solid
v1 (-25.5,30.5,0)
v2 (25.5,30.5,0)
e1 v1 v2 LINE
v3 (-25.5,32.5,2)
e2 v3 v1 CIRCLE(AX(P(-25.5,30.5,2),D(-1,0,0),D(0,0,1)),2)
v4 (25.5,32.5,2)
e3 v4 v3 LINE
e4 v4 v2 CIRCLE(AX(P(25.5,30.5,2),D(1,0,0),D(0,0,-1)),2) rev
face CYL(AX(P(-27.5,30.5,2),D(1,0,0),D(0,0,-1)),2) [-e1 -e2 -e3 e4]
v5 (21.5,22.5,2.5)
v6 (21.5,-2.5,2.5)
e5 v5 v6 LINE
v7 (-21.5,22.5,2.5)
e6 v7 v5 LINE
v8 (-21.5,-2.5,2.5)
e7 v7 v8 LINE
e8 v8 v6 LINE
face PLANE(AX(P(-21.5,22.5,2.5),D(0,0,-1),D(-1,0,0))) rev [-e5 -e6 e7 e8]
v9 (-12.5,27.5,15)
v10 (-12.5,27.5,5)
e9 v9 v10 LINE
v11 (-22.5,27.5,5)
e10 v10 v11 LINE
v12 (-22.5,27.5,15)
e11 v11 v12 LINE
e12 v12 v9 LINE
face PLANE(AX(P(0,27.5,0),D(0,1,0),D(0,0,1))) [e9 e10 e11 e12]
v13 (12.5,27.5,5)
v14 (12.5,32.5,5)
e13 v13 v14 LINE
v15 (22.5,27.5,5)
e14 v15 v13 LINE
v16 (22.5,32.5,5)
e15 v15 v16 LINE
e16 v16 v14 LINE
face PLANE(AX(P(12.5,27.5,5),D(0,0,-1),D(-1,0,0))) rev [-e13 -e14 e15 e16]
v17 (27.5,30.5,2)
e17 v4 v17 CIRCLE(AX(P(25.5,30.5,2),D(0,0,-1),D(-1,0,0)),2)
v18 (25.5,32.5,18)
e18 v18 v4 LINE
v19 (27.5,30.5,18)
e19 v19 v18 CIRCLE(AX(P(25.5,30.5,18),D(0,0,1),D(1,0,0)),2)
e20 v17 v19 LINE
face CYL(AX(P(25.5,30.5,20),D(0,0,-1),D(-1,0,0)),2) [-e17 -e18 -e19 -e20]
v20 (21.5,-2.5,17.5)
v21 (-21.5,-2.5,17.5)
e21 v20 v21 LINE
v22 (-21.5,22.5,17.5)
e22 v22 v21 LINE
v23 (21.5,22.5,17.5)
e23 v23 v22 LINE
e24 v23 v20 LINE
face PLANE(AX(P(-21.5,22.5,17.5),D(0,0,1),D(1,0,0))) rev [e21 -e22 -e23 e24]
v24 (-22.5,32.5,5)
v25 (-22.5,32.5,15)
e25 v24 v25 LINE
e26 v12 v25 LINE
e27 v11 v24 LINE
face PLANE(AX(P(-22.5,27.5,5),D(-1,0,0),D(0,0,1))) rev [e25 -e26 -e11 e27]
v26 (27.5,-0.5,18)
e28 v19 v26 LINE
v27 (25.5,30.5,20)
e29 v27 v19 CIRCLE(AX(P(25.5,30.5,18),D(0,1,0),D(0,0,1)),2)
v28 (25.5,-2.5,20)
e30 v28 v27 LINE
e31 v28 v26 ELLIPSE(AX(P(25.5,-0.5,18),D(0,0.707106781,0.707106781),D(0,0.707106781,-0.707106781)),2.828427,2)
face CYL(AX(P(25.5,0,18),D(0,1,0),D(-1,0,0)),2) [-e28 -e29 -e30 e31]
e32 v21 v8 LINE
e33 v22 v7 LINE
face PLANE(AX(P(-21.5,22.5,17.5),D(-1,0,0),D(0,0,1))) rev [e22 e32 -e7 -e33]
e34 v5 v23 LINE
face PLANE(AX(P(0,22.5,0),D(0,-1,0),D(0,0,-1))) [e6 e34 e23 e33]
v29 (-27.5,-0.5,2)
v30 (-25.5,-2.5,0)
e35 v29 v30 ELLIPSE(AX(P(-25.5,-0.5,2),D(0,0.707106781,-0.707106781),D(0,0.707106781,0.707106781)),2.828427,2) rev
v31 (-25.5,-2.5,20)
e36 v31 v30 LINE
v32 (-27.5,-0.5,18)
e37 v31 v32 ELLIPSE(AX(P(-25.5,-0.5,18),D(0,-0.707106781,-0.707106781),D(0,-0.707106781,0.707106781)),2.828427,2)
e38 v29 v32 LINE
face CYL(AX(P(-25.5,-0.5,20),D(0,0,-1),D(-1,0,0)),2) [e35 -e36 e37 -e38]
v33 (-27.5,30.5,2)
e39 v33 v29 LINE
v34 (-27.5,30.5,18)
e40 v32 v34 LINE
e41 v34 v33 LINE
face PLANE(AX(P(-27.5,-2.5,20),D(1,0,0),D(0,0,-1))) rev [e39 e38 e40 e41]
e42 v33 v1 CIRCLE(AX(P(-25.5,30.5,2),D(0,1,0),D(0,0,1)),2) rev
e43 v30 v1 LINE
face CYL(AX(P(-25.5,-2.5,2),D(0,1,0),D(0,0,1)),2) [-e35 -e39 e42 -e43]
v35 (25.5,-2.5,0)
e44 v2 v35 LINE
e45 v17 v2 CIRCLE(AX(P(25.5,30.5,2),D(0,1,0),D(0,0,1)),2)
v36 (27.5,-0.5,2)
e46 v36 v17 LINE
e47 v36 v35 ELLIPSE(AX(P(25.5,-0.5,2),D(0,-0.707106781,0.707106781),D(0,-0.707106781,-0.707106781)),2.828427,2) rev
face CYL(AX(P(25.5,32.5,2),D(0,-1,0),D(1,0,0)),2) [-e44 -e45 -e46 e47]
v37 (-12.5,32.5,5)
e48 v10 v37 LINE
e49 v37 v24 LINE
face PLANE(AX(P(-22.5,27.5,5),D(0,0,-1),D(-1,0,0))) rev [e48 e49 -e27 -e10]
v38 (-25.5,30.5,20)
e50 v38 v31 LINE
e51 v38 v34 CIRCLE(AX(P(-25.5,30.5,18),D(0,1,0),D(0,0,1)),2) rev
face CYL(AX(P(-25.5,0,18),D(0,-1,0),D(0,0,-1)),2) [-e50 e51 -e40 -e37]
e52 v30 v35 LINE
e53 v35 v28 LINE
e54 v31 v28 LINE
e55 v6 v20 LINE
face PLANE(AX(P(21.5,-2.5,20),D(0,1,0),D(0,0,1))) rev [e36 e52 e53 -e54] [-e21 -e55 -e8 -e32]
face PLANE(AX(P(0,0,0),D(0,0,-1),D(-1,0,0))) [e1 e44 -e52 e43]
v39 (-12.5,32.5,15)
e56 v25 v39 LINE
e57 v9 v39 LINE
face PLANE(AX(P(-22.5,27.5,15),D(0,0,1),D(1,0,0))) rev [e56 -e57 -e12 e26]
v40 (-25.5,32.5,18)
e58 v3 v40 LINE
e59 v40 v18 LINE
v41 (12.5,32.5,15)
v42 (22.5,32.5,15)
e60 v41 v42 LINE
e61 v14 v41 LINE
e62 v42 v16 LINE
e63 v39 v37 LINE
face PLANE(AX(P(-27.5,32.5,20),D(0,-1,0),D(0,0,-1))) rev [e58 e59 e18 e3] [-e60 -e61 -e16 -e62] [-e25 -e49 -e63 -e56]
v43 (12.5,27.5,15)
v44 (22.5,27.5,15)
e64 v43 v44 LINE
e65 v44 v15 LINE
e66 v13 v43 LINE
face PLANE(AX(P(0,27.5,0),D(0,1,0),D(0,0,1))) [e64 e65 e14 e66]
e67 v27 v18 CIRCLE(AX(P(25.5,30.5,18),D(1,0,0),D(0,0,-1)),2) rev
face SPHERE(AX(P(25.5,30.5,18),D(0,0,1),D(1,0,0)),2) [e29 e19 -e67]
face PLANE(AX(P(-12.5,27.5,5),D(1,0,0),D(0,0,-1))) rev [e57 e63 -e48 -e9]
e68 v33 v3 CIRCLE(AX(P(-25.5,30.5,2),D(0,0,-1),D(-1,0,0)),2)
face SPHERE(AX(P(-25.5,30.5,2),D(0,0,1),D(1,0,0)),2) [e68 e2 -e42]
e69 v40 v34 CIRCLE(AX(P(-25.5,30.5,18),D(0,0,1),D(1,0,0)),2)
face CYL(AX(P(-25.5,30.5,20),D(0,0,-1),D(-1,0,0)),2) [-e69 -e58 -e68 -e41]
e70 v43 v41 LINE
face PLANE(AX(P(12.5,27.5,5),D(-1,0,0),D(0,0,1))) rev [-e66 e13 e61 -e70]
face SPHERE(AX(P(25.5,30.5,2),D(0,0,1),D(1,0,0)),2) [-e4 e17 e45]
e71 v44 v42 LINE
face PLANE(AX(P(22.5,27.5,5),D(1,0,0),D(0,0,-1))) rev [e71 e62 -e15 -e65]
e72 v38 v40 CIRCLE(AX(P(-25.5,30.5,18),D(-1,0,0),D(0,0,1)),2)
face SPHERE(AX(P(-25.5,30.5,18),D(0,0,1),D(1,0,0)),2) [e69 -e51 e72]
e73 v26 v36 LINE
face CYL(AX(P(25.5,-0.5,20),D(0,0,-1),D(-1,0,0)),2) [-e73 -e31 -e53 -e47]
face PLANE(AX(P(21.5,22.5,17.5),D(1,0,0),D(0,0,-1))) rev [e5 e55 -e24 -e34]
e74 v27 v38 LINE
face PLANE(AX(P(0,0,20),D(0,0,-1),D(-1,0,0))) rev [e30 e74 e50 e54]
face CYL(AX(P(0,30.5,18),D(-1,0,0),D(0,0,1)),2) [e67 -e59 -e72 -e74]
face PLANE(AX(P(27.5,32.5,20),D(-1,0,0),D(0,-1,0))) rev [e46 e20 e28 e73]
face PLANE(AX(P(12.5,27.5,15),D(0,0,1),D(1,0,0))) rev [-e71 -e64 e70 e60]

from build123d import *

# Parameters (mm, degrees)
BOSS_EXTRUDE1_DEPTH = 20
SKETCH6_W           = 10
SKETCH6_H           = 10
CUT_EXTRUDE2_DEPTH  = 5
SKETCH7_W           = 10
SKETCH7_H           = 10
CUT_EXTRUDE3_DEPTH  = 5
FILLET1_R           = 2
FILLET2_R           = 2
CUT_EXTRUDE4_DEPTH  = 30
SKETCH9_W           = 43
SKETCH9_H           = 15
CUT_EXTRUDE5_DEPTH  = 25


with BuildPart() as part:
    # Sketch1 → Boss-Extrude1 (new body)
    with BuildSketch(Plane.XY):
        Polygon((-27.5, 32.5), (27.5, 32.5), (27.5, -2.5), (21.5, -2.5), (21.5, -32.5), (-21.5, -32.5), (-21.5, -2.5), (-27.5, -2.5), align=None)
    extrude(amount=BOSS_EXTRUDE1_DEPTH)

    # Sketch6 → Cut-Extrude2 (cut)
    with BuildSketch(Plane(origin=(0, 32.5, 0), x_dir=(1, 0, 0), z_dir=(0, 1, 0))):
        with Locations((-17.5, -10)):
            Rectangle(SKETCH6_W, SKETCH6_H)
        with Locations((17.5, -10)):
            Rectangle(SKETCH6_W, SKETCH6_H)
    extrude(amount=-CUT_EXTRUDE2_DEPTH, mode=Mode.SUBTRACT)

    # Sketch7 → Cut-Extrude3 (cut)
    with BuildSketch(Plane.XZ.offset(32.5)):
        with Locations((-14, 7.5)):
            Rectangle(SKETCH7_W, SKETCH7_H)
        with Locations((14, 7.5)):
            Rectangle(SKETCH7_W, SKETCH7_H)
    extrude(amount=-CUT_EXTRUDE3_DEPTH, mode=Mode.SUBTRACT)

    # Fillet1
    fillet1_edges = [part.edges().sort_by_distance(p)[0] for p in [
        (-21.5, -17.5, 0),
        (-27.5, 15, 0),
        (-27.5, 32.5, 10),
        (27.5, 32.5, 10),
        (27.5, -2.5, 10),
        (-21.5, -32.5, 10),
        (-27.5, -2.5, 10),
        (0, -32.5, 20),
        (21.5, -17.5, 20),
        (27.5, 15, 20),
        (0, 32.5, 20),
        (-27.5, 15, 20),
        (0, 32.5, 0),
        (27.5, 15, 0),
        (21.5, -17.5, 0),
    ]]
    fillet(fillet1_edges, radius=FILLET1_R)

    # Fillet2
    # the kernel refuses this fillet: 2 mm, written as the material it takes off along each edge
    with BuildSketch(Plane(origin=(-19.5, -30.5, 2), x_dir=(0, 0, -1), z_dir=(0, -1, 0))) as fillet2_piece_1_section:
        Polygon((0, 0), (FILLET2_R, 0), (FILLET2_R, -FILLET2_R), (0, -FILLET2_R), align=None)
    fillet2_piece_1 = extrude(amount=FILLET2_R, mode=Mode.PRIVATE)
    fillet2_piece_1 = fillet2_piece_1 - Plane(origin=(-19.5, -30.5, 2), x_dir=(0.7071067811865475, 0, 0.7071067811865475), z_dir=(0, -1, 0)) * Sphere(FILLET2_R, mode=Mode.PRIVATE)
    add(fillet2_piece_1, mode=Mode.SUBTRACT)
    with BuildSketch(Plane(origin=(19.5, -30.5, 18), x_dir=(1, 0, 0), z_dir=(0, -1, 0))) as fillet2_piece_2_section:
        Polygon((0, 0), (FILLET2_R, 0), (FILLET2_R, FILLET2_R), (0, FILLET2_R), align=None)
    fillet2_piece_2 = extrude(amount=FILLET2_R, mode=Mode.PRIVATE)
    fillet2_piece_2 = fillet2_piece_2 - Plane(origin=(19.5, -30.5, 18), x_dir=(-0.7071067811865475, 0, -0.7071067811865475), z_dir=(0, -1, 0)) * Sphere(FILLET2_R, mode=Mode.PRIVATE)
    add(fillet2_piece_2, mode=Mode.SUBTRACT)
    with BuildSketch(Plane(origin=(21.5, -32.5, 2), x_dir=(-1, 0, 0), z_dir=(0, 0, 1))) as fillet2_piece_3:
        with BuildLine():
            CenterArc((FILLET2_R, -FILLET2_R), FILLET2_R, 90, 90)
            Line((0, -FILLET2_R), (0, 0))
            Line((0, 0), (FILLET2_R, 0))
        make_face()
    extrude(amount=16, mode=Mode.SUBTRACT)
    with BuildSketch(Plane(origin=(19.5, -32.5, 0), x_dir=(0, 0, 1), z_dir=(-1, 0, 0))) as fillet2_piece_4:
        with BuildLine():
            CenterArc((FILLET2_R, FILLET2_R), FILLET2_R, 180, 90)
            Line((0, FILLET2_R), (0, 0))
            Line((0, 0), (FILLET2_R, 0))
        make_face()
    extrude(amount=39, mode=Mode.SUBTRACT)
    with BuildSketch(Plane(origin=(19.5, -32.5, 2), x_dir=(0, 0, -1), z_dir=(-1, 0, 0))) as fillet2_piece_5:
        with BuildLine():
            CenterArc((2 - FILLET2_R, -FILLET2_R), FILLET2_R, 360, 90)
            Line((2, -FILLET2_R), (2, 0))
            Line((2, 0), (2 - FILLET2_R, 0))
        make_face()
    revolve(axis=Axis((19.5, -32.5, 2), (0, -1, 0)), revolution_arc=90, mode=Mode.SUBTRACT)

    # Sketch8 → Cut-Extrude4 (cut)
    with BuildSketch(Plane(origin=(0, -2.5, 0), x_dir=(-1, 0, 0), z_dir=(0, -1, 0))):
        Polygon((-23.544279595, 2.278765761), (24.281911255, 2.554989635), (24.437245142, -24.339963353), (-23.544279595, -24.339963353), align=None)
    extrude(amount=CUT_EXTRUDE4_DEPTH, mode=Mode.SUBTRACT)

    # Sketch9 → Cut-Extrude5 (cut)
    with BuildSketch(Plane.XZ.offset(2.5)):
        with Locations((0, 10)):
            Rectangle(SKETCH9_W, SKETCH9_H)
    extrude(amount=-CUT_EXTRUDE5_DEPTH, mode=Mode.SUBTRACT)


solid = part.part
